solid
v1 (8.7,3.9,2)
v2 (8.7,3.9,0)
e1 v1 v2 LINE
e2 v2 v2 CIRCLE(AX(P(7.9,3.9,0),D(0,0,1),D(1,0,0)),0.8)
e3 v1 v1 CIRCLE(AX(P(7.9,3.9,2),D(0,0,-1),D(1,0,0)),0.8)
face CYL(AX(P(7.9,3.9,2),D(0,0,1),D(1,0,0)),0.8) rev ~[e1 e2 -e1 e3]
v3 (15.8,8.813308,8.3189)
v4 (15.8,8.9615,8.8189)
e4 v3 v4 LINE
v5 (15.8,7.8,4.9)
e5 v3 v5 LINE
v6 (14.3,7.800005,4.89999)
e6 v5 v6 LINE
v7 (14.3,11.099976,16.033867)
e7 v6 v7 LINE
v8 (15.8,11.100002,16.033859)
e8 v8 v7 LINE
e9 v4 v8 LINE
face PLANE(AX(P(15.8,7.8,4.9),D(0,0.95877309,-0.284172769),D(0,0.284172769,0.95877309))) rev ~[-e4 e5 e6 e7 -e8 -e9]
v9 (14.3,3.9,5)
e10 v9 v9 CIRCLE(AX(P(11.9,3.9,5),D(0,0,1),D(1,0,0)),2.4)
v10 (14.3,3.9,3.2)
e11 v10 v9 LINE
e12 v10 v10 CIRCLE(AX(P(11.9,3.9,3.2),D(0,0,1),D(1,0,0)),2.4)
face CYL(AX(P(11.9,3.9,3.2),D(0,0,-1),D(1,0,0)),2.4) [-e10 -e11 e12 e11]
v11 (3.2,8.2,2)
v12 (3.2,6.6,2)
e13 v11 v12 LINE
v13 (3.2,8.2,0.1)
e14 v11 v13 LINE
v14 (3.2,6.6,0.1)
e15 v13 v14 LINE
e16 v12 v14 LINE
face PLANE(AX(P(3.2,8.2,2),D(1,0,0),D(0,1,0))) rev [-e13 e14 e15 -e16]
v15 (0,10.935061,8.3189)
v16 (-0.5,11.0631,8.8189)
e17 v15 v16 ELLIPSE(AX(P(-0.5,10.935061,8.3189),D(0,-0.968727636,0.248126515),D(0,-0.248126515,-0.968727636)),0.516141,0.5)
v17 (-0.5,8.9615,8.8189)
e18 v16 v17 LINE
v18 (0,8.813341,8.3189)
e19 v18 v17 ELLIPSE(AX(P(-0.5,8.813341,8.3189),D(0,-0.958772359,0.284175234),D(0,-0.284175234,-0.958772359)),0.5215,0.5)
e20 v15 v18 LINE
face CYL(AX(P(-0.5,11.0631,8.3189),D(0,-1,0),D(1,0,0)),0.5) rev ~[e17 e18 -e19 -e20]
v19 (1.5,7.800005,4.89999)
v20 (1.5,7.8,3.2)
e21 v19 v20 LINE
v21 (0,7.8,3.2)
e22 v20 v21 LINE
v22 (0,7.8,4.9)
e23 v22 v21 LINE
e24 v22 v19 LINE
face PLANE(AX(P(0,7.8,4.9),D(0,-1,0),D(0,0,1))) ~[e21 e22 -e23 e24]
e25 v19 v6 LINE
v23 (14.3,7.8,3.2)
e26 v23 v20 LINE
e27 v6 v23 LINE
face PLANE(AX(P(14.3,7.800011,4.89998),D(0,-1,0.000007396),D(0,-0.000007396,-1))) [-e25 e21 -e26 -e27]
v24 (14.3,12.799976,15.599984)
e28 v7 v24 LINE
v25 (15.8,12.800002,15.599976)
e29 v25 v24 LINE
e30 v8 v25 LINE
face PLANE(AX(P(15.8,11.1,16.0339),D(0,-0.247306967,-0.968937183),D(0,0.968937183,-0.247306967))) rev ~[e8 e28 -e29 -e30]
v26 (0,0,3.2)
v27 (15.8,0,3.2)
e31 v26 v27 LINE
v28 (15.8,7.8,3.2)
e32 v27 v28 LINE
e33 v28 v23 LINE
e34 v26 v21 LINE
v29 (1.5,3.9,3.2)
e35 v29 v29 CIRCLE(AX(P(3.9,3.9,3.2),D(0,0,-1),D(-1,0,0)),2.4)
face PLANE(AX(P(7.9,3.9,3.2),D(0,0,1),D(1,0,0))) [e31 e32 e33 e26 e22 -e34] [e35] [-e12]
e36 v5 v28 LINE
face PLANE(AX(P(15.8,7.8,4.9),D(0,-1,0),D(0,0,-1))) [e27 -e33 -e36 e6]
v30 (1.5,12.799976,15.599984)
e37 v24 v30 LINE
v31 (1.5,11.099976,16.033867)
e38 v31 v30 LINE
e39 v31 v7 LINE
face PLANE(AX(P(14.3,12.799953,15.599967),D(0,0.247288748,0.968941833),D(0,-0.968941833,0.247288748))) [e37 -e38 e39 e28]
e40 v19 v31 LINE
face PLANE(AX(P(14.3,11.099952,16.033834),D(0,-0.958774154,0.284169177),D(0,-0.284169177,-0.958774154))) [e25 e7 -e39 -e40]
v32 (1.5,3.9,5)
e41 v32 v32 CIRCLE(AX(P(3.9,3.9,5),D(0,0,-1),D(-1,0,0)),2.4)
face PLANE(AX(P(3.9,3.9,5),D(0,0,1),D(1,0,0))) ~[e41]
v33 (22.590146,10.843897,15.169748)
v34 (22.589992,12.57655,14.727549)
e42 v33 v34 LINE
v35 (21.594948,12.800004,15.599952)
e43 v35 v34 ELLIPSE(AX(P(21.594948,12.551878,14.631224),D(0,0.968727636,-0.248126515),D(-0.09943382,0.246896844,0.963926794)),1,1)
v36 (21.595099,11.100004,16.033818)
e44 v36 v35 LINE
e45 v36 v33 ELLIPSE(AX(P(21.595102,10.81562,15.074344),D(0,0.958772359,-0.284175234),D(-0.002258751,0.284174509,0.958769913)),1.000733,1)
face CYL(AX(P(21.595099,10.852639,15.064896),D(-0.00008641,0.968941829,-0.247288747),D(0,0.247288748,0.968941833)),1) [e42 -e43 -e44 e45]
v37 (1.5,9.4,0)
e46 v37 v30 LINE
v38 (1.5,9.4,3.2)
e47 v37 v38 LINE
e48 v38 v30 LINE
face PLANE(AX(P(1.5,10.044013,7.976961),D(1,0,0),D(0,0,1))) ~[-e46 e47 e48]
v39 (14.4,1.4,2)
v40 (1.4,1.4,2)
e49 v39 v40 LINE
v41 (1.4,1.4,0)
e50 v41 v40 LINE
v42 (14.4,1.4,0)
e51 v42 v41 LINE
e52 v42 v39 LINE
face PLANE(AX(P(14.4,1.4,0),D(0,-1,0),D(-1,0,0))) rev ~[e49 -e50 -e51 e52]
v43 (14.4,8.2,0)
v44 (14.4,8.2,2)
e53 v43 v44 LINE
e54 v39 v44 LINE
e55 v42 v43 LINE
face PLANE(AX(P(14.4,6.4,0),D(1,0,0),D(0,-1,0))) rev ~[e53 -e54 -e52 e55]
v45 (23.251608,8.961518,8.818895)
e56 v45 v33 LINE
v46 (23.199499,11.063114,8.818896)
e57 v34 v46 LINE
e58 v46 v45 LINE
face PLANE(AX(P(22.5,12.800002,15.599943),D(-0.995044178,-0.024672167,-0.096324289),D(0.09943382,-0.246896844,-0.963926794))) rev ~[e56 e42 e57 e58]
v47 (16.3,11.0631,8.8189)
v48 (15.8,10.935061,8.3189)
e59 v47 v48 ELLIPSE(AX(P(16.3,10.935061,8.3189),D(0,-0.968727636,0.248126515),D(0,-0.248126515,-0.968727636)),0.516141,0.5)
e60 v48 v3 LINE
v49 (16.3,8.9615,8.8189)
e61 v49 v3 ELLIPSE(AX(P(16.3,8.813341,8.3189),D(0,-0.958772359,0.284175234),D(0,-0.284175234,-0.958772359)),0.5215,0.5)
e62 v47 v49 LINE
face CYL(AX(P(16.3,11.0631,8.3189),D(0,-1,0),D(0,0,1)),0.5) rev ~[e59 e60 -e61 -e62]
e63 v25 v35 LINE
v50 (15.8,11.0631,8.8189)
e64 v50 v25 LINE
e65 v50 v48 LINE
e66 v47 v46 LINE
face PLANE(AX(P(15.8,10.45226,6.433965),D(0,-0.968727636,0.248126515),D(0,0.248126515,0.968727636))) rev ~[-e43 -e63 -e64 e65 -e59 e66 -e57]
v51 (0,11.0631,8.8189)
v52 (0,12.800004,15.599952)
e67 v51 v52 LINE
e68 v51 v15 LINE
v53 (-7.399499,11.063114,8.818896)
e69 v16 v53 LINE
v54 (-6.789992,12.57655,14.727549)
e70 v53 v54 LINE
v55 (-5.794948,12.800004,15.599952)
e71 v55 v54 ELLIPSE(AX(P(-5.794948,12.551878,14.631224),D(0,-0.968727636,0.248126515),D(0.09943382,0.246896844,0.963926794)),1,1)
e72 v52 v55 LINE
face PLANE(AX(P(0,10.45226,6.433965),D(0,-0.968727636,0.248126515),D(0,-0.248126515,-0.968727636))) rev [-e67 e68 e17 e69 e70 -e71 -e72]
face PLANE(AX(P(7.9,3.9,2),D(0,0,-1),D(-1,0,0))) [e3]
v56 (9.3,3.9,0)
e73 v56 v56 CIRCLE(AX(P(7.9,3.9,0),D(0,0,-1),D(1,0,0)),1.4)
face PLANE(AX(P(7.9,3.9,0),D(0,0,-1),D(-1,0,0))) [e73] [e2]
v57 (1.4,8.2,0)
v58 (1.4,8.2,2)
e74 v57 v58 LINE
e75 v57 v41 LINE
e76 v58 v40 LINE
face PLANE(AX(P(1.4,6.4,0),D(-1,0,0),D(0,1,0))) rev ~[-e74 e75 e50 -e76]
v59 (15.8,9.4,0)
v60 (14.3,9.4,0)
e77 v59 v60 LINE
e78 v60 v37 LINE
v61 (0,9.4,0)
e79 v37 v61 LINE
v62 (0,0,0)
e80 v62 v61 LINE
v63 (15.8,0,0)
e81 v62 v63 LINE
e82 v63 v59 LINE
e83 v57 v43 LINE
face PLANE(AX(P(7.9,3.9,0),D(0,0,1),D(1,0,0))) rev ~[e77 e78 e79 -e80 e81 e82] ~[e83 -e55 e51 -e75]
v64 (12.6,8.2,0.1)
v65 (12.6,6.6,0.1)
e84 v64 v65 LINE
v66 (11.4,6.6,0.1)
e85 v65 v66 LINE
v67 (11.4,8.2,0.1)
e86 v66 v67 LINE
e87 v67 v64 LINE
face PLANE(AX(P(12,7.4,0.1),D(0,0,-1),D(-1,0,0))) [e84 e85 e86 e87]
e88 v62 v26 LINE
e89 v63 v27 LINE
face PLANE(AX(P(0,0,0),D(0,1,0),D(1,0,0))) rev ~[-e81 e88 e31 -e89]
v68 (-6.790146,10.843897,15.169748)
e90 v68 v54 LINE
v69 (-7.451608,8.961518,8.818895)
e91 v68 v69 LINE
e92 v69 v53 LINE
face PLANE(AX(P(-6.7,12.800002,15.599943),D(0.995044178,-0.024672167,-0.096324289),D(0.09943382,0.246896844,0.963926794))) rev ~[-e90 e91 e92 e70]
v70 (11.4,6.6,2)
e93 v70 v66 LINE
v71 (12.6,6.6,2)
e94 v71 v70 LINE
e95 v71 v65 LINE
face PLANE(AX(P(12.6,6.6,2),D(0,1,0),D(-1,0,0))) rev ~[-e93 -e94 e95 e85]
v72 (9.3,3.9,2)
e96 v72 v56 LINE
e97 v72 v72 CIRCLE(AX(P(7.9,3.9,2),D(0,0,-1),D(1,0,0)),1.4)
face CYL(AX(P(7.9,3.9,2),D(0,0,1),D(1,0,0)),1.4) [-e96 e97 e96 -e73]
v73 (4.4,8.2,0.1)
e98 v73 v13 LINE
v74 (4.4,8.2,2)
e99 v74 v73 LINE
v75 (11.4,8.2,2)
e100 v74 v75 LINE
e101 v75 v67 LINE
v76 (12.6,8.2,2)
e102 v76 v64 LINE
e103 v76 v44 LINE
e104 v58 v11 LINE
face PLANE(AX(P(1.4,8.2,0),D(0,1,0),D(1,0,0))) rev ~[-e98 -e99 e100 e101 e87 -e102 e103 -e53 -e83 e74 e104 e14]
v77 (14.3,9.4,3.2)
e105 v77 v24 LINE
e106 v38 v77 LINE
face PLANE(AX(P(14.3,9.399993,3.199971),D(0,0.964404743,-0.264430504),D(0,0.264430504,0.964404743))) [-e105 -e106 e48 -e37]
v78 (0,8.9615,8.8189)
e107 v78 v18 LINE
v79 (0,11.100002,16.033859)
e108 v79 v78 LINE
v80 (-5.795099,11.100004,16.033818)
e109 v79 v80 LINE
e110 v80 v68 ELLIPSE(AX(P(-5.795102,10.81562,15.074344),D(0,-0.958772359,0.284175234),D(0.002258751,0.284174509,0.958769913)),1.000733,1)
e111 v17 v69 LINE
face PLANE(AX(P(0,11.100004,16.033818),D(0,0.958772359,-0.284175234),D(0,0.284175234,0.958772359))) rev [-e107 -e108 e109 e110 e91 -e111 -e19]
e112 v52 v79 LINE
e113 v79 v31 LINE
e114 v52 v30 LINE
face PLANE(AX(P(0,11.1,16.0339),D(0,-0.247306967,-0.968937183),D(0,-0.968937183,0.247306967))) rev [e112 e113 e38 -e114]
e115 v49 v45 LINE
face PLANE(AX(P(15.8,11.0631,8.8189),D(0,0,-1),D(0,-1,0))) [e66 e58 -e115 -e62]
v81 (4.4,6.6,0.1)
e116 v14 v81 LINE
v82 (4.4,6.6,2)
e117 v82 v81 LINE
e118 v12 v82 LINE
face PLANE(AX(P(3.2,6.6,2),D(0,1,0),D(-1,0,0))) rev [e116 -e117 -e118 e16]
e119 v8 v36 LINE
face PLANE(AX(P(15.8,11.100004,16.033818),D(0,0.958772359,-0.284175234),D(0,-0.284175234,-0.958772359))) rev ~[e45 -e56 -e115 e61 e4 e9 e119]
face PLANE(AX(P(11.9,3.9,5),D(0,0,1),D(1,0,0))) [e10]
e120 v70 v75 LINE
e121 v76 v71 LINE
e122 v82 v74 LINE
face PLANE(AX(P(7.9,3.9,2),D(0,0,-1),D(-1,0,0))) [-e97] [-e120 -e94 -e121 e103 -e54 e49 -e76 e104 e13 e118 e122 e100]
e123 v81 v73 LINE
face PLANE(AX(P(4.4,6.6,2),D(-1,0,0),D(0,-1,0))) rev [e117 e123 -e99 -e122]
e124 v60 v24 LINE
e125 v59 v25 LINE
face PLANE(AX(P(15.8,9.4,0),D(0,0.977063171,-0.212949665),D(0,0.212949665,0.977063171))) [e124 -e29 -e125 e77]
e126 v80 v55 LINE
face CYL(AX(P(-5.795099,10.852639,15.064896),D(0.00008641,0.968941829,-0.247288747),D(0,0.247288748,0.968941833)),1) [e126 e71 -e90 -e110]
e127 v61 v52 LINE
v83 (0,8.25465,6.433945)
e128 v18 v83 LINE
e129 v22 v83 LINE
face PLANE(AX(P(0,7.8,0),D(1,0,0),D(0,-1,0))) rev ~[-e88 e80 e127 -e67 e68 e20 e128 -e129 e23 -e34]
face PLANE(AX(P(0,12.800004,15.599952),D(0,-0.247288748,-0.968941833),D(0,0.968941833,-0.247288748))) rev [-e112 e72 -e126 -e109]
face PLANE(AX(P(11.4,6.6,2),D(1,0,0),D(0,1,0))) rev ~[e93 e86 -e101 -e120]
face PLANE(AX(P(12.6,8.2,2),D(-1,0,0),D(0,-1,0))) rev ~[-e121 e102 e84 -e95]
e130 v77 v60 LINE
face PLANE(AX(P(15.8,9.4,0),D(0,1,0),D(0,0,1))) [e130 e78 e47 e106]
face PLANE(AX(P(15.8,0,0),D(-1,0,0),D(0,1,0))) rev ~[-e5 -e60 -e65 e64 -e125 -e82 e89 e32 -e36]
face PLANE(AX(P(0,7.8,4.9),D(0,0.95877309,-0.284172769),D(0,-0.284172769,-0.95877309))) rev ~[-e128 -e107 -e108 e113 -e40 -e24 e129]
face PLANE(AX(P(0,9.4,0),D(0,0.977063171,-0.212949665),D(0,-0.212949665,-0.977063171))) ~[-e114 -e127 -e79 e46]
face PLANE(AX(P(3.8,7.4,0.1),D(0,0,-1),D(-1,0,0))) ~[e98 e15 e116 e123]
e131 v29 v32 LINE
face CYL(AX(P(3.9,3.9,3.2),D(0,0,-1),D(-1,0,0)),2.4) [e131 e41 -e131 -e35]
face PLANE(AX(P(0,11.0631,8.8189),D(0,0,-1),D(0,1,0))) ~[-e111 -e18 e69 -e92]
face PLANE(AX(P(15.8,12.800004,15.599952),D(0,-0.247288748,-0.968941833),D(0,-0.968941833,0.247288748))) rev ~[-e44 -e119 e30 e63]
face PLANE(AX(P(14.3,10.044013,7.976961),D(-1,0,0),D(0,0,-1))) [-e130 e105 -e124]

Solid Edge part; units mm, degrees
sketch "Sketch1" plane through (0, 0, 0) normal (0, 0, 1) x (1, 0, 0)
  line L0 (0, 0) -> (15.8, 0)
  line L1 (15.8, 0) -> (15.8, 7.8)
  line L2 (15.8, 7.8) -> (0, 7.8)
  line L3 (0, 7.8) -> (0, 0)
extrude "Protrusion1" add sketch "Sketch1" along normal blind 3.2
sketch "Sketch2" plane through (7.9, 3.9, 3.2) normal (0, 0, 1) x (1, 0, 0)
  circle A0 centre (4, 0) radius 2.4
  dimension "D1" = 4.8
  dimension "D2" = 3.9
extrude "ExtrudedProtrusion_2" add sketch "Sketch2" along normal blind 1.8
mirror "Mirror1" about plane through (7.9, 0, 0) normal (1, 0, 0) of "ExtrudedProtrusion_2"
sketch "Sketch3" plane through (7.9, 3.9, 0) normal (0, 0, -1) x (1, 0, 0)
  line L0 (-6.5, -2.5) -> (6.5, -2.5)
  line L1 (6.5, -2.5) -> (6.5, 2.5)
  line L2 (6.5, 2.5) -> (-6.5, 2.5)
  line L3 (-6.5, 2.5) -> (-6.5, -2.5)
extrude "ExtrudedCutout_1" cut sketch "Sketch3" against normal blind 2
sketch "Sketch4" plane through (7.9, 3.9, 2) normal (0, 0, -1) x (1, 0, 0)
  circle A0 centre (0, 0) radius 1.4
extrude "ExtrudedProtrusion_3" add sketch "Sketch4" along normal blind 2
sketch "Sketch5" plane through (7.9, 3.9, 2) normal (0, 0, -1) x (1, 0, 0)
  circle A0 centre (0, 0) radius 0.8
extrude "ExtrudedCutout_2" cut sketch "Sketch5" along normal blind 20
sketch "Sketch6" plane through (15.8, 3.9, 1.6) normal (1, 0, 0) x (0, 1, 0)
  line L0 (3.9, 3.3) -> (7.2, 14.4339)
  line L1 (7.2, 14.4339) -> (8.9, 14)
  line L2 (5.5, -1.6) -> (8.9, 14)
  line L3 (3.9, -1.6) -> (5.5, -1.6)
  line L4 (3.9, 3.3) -> (3.9, -1.6)
extrude "ExtrudedProtrusion_4" add sketch "Sketch6" against normal blind 1.5
sketch "Sketch7" plane through (15.8, 6.4, 8.0169) normal (1, 0, 0) x (0, 1, 0)
  line L0 (3, -8.0169) -> (3, -4.8169)
  line L1 (3, -4.8169) -> (1.4, -4.8169)
  line L2 (1.4, -4.8169) -> (1.4, -8.0169)
  line L3 (1.4, -8.0169) -> (3, -8.0169)
extrude "ExtrudedProtrusion_5" add sketch "Sketch7" against normal blind 15.8
sketch "Sketch8" plane through (14.3, 10.3, 8.0169) normal (-1, 0, 0) x (0, -0.2129497, -0.9770632)
  line L0 (4.8981, -0.1464) -> (-7.9415, -0.8278)
  line L1 (-7.9415, -0.8278) -> (-8.0034, 0.9256)
  line L2 (-8.0034, 0.9256) -> (3.5778, 1.7789)
  line L3 (3.5778, 1.7789) -> (5.2388, 1.4169)
  line L4 (5.2388, 1.4169) -> (4.8981, -0.1464)
extrude "ExtrudedProtrusion_6" add sketch "Sketch8" along normal blind 7.9
sketch "Sketch9" plane through (15.8, 6.4, 8.0169) normal (1, 0, 0) x (0, 0.2129497, 0.9770632)
  line L0 (-1.1517, -2.1492) -> (-0.6837, -4.2964)
  line L1 (-0.6837, -4.2964) -> (8.772, -4.6384)
  line L2 (8.772, -4.6384) -> (8.8339, -2.885)
  line L3 (8.8339, -2.885) -> (-1.1517, -2.1492)
extrude "Protrusion2" add sketch "Sketch9" along normal blind 7.7
sketch "Sketch10" plane through (19.65, 11.6261, 11.017) normal (0, 0.9687267, -0.2481301) x (0, -0.2481301, -0.9687267)
  line L0 (-4.7309, -3.85) -> (-4.7309, -2.85)
  line L1 (-4.7309, -2.85) -> (5.2762, -3.85)
  line L2 (5.2762, -3.85) -> (-4.7309, -3.85)
extrude "ExtrudedCutout_6" cut sketch "Sketch10" along normal mid plane 40
fillet "Round_2" radius 1 1 edges at (22.5001, 11.95, 15.8169)
fillet "Round_3" radius 0.2 1 edges at (23.4728, 9.3535, 6.434)
mirror "Mirror2" about plane through (7.9, 0, 0) normal (1, 0, 0) of "Protrusion2", "Round_2", "ExtrudedCutout_6", "ExtrudedProtrusion_4", "ExtrudedProtrusion_6", "Round_3"
sketch "Sketch11" plane through (15.8, 6.4, 7.8) normal (1, 0, 0) x (0, 1, 0)
  line L0 (4.6631, 1.0189) -> (2.5615, 1.0189)
  line L1 (2.5615, 1.0189) -> (1.8547, -1.366)
  line L2 (1.8547, -1.366) -> (4.0522, -1.366)
  line L3 (4.0522, -1.366) -> (4.6631, 1.0189)
extrude "ExtrudedCutout_7" cut sketch "Sketch11" along normal blind 20
mirror "Mirror3" about plane through (7.9, 0, 0) normal (1, 0, 0) of "ExtrudedCutout_7"
sketch "Sketch12" plane through (7.9, 4.7, 0) normal (0, 0, -1) x (1, 0, 0)
  line L0 (6.5, -3.5) -> (6.5, -1.7)
  line L1 (6.5, -1.7) -> (-6.5, -1.7)
  line L2 (-6.5, -1.7) -> (-6.5, -3.5)
  line L3 (-6.5, -3.5) -> (6.5, -3.5)
extrude "ExtrudedCutout_9" cut sketch "Sketch12" against normal blind 2
sketch "Sketch13" plane through (7.9, 4.8, 2) normal (0, 0, -1) x (1, 0, 0)
  line L0 (3.5, -3.4) -> (4.7, -3.4)
  line L1 (4.7, -3.4) -> (4.7, -1.8)
  line L2 (4.7, -1.8) -> (3.5, -1.8)
  line L3 (3.5, -1.8) -> (3.5, -3.4)
extrude "ExtrudedProtrusion_9" add sketch "Sketch13" along normal blind 1.9
mirror "Mirror4" about plane through (7.9, 0, 0) normal (1, 0, 0) of "ExtrudedProtrusion_9"
fillet "Round_4" radius 0.5 2 edges at (0, 10.0123, 8.8189) (15.8, 10.0123, 8.8189)
